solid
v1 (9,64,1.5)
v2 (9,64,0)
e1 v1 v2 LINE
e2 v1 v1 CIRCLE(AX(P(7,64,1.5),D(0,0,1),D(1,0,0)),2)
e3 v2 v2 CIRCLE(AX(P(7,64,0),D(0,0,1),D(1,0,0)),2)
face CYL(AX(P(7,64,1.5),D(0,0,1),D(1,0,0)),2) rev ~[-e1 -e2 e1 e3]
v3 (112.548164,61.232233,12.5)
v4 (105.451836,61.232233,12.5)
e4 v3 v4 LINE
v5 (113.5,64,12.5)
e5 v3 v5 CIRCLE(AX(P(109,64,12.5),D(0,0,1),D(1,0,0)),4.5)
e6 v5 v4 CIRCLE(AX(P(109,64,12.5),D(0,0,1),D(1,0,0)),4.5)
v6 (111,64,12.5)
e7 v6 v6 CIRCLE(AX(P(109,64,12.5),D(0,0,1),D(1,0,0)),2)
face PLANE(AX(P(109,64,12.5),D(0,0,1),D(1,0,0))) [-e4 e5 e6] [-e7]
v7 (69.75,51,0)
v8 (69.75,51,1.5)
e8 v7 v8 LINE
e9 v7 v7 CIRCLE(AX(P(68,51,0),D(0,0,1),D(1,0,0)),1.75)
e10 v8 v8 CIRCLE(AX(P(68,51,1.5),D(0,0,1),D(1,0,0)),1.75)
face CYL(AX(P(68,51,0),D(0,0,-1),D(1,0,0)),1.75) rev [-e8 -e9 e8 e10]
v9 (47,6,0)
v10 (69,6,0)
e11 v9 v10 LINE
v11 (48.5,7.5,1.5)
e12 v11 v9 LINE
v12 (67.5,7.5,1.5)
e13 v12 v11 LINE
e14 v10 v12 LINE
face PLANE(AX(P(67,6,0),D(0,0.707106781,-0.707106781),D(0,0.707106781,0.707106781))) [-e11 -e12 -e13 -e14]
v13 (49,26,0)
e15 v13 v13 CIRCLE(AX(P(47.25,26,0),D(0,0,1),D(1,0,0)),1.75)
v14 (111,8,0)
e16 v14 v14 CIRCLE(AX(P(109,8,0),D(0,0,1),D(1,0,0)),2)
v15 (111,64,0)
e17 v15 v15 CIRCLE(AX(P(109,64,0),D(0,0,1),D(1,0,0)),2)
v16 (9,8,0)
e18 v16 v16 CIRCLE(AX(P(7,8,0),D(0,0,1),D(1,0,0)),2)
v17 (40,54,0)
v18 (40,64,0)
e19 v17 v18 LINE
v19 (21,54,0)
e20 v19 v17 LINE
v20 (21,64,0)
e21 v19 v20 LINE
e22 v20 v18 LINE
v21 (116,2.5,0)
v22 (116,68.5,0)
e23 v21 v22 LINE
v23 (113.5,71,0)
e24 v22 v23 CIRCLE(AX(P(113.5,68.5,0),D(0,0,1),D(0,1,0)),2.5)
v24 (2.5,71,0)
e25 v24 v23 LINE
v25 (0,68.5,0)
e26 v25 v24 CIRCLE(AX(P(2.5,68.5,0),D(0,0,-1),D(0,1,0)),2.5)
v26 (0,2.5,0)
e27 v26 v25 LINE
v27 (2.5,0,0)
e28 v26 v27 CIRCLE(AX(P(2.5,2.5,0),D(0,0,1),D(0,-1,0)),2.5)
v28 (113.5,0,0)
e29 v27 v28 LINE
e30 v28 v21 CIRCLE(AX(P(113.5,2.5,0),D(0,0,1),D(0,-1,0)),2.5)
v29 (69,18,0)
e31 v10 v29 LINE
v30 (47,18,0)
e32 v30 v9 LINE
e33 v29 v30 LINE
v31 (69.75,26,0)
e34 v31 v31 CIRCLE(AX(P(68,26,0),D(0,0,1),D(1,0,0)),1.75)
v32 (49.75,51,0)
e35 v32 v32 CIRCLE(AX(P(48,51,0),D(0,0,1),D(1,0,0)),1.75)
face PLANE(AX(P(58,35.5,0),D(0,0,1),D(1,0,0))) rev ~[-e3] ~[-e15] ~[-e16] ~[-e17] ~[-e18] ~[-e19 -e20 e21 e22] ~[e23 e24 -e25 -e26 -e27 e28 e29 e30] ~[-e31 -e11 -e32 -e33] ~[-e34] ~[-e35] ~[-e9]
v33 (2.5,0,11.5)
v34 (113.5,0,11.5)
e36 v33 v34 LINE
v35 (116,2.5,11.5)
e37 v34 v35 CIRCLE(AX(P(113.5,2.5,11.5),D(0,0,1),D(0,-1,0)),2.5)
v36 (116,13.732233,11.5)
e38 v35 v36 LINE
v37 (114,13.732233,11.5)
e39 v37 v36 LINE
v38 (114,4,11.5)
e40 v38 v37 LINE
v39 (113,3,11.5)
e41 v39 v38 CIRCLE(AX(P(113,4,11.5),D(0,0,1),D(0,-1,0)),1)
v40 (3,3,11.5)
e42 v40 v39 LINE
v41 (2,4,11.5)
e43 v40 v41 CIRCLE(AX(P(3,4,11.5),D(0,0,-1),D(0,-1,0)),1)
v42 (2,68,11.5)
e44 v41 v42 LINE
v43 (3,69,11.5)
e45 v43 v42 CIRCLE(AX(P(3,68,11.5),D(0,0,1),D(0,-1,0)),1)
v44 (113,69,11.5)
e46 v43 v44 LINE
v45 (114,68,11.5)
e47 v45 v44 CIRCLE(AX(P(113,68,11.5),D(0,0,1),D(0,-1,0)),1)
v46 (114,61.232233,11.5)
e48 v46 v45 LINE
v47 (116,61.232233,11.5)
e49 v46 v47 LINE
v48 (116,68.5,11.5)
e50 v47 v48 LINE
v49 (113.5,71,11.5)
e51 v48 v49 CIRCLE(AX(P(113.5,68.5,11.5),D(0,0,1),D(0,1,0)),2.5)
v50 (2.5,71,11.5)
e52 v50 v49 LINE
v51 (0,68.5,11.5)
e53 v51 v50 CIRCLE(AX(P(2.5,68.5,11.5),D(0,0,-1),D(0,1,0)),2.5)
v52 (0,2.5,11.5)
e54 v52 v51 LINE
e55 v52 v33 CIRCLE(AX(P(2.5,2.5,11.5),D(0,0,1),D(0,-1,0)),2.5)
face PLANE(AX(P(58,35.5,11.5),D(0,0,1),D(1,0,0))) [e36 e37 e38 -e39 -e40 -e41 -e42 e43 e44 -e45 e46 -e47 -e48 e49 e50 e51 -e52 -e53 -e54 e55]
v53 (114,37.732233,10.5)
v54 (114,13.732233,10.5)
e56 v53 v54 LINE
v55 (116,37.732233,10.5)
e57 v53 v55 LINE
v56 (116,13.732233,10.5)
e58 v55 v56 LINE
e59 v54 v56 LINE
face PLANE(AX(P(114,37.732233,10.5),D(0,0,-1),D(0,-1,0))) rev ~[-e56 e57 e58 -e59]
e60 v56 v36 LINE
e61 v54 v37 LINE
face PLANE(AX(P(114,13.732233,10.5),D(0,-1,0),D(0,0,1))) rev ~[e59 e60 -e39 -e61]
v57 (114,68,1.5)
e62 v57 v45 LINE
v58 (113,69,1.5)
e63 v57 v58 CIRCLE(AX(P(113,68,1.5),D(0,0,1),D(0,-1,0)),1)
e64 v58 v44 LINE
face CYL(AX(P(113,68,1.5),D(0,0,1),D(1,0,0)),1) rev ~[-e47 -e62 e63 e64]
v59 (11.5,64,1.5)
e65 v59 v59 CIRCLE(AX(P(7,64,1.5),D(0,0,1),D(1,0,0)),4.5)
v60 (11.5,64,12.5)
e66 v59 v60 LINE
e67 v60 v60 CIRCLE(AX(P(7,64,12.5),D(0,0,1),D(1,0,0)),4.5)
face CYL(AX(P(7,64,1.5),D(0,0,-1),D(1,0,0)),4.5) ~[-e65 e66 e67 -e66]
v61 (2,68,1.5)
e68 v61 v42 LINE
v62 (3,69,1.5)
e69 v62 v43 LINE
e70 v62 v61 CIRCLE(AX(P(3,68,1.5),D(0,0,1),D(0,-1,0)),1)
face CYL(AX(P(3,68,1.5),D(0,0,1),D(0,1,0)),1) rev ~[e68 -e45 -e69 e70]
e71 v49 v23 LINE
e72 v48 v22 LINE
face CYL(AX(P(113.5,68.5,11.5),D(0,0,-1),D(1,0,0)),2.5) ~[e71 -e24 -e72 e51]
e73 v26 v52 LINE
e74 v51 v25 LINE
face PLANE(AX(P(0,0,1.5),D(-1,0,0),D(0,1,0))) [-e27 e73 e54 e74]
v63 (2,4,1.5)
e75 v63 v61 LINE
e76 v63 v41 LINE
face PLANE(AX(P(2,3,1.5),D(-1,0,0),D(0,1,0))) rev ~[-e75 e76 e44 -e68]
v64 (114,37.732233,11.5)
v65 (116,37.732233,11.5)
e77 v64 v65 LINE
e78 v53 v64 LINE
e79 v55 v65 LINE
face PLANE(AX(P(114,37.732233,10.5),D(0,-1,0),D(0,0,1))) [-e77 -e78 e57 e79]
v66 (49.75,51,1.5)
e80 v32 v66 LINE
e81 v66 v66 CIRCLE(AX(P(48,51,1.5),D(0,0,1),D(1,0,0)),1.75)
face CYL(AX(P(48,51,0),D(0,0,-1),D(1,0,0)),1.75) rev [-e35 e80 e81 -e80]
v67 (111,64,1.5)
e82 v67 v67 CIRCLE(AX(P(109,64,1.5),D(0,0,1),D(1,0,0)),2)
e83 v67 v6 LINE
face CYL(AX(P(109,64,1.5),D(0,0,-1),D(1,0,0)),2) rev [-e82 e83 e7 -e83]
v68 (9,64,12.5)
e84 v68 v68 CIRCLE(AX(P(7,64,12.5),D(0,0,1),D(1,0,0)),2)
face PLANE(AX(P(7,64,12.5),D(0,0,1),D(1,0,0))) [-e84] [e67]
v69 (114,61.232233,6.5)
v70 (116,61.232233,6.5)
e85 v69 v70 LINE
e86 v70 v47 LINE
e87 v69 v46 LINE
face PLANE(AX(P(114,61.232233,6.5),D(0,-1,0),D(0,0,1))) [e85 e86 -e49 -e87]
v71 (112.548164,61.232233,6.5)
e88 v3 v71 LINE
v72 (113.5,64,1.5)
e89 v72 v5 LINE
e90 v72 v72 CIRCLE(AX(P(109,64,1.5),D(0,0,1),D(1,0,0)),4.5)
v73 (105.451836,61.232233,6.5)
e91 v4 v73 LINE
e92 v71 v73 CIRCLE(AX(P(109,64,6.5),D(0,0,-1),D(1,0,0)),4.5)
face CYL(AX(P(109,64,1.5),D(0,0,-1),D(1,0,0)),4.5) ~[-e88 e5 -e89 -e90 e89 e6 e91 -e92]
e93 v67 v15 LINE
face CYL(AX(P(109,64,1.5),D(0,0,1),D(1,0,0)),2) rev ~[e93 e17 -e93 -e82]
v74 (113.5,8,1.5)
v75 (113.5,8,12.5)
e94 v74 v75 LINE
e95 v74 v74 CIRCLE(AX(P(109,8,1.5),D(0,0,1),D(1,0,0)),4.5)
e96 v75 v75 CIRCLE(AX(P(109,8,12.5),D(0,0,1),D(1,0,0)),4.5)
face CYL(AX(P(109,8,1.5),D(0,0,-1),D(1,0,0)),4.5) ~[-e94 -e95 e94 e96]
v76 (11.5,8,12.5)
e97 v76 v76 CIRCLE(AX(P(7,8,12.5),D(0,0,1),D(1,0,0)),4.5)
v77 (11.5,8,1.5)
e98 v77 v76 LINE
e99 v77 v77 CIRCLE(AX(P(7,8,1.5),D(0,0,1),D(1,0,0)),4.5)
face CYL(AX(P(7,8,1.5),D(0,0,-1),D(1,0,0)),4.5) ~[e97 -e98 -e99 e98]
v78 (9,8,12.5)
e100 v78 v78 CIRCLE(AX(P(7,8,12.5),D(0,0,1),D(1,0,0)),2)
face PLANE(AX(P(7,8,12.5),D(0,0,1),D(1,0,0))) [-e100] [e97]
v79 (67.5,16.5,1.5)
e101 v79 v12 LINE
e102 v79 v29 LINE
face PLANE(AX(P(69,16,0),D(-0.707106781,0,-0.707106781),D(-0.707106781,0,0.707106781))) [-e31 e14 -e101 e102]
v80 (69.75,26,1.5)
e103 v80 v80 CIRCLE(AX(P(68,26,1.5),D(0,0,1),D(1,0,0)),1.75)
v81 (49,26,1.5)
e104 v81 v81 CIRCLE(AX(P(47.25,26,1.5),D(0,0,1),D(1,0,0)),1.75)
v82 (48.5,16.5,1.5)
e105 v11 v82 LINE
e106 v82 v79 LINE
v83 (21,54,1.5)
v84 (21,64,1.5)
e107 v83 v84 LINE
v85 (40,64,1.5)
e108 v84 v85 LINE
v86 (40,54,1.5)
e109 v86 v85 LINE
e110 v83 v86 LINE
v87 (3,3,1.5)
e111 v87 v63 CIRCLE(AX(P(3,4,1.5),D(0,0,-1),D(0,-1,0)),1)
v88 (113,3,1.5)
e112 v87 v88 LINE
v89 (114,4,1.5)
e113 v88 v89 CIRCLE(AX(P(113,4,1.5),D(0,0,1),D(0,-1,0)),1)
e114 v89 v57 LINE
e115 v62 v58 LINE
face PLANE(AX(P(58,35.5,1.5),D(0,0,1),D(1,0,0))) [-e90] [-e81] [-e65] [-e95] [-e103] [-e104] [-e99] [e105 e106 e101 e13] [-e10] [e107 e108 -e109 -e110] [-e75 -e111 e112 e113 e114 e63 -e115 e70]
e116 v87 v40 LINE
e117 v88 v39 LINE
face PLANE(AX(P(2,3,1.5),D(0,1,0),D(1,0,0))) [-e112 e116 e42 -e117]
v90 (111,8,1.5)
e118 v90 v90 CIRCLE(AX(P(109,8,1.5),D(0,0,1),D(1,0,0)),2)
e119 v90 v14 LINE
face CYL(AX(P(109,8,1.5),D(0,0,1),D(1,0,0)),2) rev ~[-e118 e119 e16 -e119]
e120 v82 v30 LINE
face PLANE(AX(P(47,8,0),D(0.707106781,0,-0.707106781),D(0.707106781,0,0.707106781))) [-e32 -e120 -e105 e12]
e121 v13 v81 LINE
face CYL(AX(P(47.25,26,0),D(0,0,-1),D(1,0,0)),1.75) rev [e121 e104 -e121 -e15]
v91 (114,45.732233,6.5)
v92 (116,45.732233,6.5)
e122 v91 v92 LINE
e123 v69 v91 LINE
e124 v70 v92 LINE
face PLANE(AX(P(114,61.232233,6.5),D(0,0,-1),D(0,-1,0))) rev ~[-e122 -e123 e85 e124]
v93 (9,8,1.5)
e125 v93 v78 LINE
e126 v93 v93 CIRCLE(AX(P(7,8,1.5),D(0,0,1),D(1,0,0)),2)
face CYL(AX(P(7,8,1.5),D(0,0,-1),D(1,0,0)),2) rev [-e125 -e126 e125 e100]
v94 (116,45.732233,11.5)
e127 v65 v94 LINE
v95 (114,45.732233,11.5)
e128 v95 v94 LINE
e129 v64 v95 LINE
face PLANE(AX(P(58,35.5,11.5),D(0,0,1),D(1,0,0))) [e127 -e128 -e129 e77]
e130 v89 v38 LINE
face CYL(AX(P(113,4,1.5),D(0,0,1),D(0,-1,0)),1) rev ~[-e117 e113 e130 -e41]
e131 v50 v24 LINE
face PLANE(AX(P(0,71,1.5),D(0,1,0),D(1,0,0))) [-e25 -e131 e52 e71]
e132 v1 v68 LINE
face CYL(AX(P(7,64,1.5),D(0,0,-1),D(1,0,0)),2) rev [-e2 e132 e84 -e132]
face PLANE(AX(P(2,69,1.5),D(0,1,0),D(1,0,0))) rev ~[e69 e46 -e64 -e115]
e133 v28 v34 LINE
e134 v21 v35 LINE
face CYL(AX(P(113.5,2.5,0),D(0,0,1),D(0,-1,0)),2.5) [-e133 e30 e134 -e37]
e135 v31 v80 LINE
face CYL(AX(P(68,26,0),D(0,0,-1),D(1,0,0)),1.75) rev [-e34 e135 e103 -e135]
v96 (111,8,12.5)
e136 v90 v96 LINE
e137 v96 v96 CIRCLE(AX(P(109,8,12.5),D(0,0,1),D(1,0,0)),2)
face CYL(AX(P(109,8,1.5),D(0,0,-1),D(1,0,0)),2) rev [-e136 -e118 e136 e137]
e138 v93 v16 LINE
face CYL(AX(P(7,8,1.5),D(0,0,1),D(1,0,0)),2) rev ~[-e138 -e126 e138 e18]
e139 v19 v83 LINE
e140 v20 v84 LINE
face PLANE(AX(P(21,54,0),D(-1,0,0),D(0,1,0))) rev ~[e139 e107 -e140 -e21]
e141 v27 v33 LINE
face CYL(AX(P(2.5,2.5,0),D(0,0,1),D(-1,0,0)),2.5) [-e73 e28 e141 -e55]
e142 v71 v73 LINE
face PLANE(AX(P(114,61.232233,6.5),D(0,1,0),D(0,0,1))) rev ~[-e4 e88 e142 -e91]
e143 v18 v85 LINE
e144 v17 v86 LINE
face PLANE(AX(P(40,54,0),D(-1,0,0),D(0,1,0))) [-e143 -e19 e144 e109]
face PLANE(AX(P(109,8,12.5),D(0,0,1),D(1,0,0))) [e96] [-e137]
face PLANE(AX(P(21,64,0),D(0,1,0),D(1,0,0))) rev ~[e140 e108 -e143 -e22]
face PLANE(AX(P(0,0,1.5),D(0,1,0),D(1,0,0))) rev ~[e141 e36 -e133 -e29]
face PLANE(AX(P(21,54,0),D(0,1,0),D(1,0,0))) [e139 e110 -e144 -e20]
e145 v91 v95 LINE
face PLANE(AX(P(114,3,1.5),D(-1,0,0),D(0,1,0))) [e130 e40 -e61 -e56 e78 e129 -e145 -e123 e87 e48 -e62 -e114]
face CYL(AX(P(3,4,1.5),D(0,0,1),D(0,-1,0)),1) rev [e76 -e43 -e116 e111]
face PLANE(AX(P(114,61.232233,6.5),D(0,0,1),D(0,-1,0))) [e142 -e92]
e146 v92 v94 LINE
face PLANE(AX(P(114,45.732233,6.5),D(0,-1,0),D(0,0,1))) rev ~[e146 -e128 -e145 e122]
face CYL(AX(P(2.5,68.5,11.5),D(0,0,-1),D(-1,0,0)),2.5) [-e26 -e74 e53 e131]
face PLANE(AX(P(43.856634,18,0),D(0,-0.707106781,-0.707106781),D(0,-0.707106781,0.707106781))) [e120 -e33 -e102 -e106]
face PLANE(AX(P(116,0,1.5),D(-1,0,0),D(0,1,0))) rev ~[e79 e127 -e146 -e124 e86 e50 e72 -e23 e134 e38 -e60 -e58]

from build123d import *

# Parameters (mm, degrees)
F0_W         = 116
F0_H         = 71
F0_R         = 1.75
F0_W_2       = 18
F0_H_2       = 8
F0_W_3       = 19
F0_H_3       = 10
F1_DEPTH     = 1.5
F2_W         = 116
F2_H         = 71
F2_W_2       = 112
F2_H_2       = 66
F3_DEPTH     = 10
F4_R         = 2.5
F5_R         = 1
F6_R         = 4.5
F6_R_2       = 2
F7_DEPTH     = 11
F8_T1_DEPTH  = 8
F8_T3_DEPTH  = 18
F8_T9_DEPTH  = 23.1433659759
F8_T13_DEPTH = 13.1433659759
F8_T20_DEPTH = 23.1433659759
F8_T24_DEPTH = 13.1433659759
F8_T31_DEPTH = 23.1433659759
F8_T35_DEPTH = 13.1433659759
F8_T42_DEPTH = 13.1433659759
F8_T46_DEPTH = 23.1433659759
F9_W         = 15.5
F9_H         = 9
F9_W_2       = 24
F9_H_2       = 5
F10_DEPTH    = 25
F11_DEPTH    = 25
F12_DEPTH    = 25


# Not quite as in the source:
# - a fillet or chamfer that OpenCascade refuses, or shapes differently, is made with other operations: its cross-section is extruded or revolved along the edge and cut away or added


with BuildPart() as f1:
    # F0 (on Top) → F1 (new body)
    with BuildSketch(Plane.XY):
        with Locations((58, 35.5)):
            Rectangle(F0_W, F0_H)
        with Locations((47.25, 26)):
            Circle(F0_R, mode=Mode.SUBTRACT)
        with Locations((58, 12)):
            Rectangle(F0_W_2, F0_H_2, mode=Mode.SUBTRACT)
        with Locations((68, 26)):
            Circle(F0_R, mode=Mode.SUBTRACT)
        with Locations((48, 51)):
            Circle(F0_R, mode=Mode.SUBTRACT)
        with Locations((30.5, 59)):
            Rectangle(F0_W_3, F0_H_3, mode=Mode.SUBTRACT)
        with Locations((68, 51)):
            Circle(F0_R, mode=Mode.SUBTRACT)
    extrude(amount=F1_DEPTH)

    # F2 (on face) → F3 (join)
    with BuildSketch(Plane.XY.offset(1.5)):
        with Locations((58, 35.5)):
            Rectangle(F2_W, F2_H)
        with Locations((58, 36)):
            Rectangle(F2_W_2, F2_H_2, mode=Mode.SUBTRACT)
    extrude(amount=F3_DEPTH)

    # F4
    f4_edges = [f1.edges().sort_by_distance(p)[0] for p in [
        (0, 0, 5.75),
        (116, 0, 5.75),
        (0, 71, 5.75),
        (116, 71, 5.75),
    ]]
    fillet(f4_edges, radius=F4_R)

    # F5
    f5_edges = [f1.edges().sort_by_distance(p)[0] for p in [
        (114, 3, 6.5),
        (2, 3, 6.5),
        (2, 69, 6.5),
        (114, 69, 6.5),
    ]]
    fillet(f5_edges, radius=F5_R)

    # F6 (on face) → F7 (join)
    with BuildSketch(Plane.XY.offset(1.5)):
        with Locations((7, 64)):
            Circle(F6_R)
        with Locations((7, 64)):
            Circle(F6_R_2, mode=Mode.SUBTRACT)
        with Locations((7, 8)):
            Circle(F6_R)
        with Locations((7, 8)):
            Circle(F6_R_2, mode=Mode.SUBTRACT)
        with Locations((109, 8)):
            Circle(F6_R)
        with Locations((109, 8)):
            Circle(F6_R_2, mode=Mode.SUBTRACT)
        with Locations((109, 64)):
            Circle(F6_R)
        with Locations((109, 64)):
            Circle(F6_R_2, mode=Mode.SUBTRACT)
    extrude(amount=F7_DEPTH)

    # F8: chamfer of 2 on 4 edges, made by hand

    # F8_s2 → F8_t1 (cut)
    with BuildSketch(Plane.XZ.offset(-16)):
        Polygon((69, 0), (67, 2), (67, 0), align=None)
        Polygon((47, 0), (49, 2), (49, 0), align=None)
    extrude(amount=F8_T1_DEPTH, mode=Mode.SUBTRACT)

    # F8_s4 → F8_t3 (cut)
    with BuildSketch(Plane.YZ.offset(49)):
        Polygon((6, 0), (8, 2), (8, 0), align=None)
        Polygon((18, 0), (16, 2), (16, 0), align=None)
    extrude(amount=F8_T3_DEPTH, mode=Mode.SUBTRACT)


with BuildPart() as f8_tool7:
    # F8_s8 → F8_t9 (new body)
    with BuildSketch(Plane.YZ.offset(49)):
        Polygon((18, 0), (16, 2), (16, 0), align=None)
    extrude(amount=F8_T9_DEPTH)

    split(bisect_by=Plane.YZ.offset(67), keep=Keep.TOP)


with BuildPart() as f8_tool11:
    # F8_s12 → F8_t13 (new body)
    with BuildSketch(Plane.XZ.offset(-21.1433659759)):
        Polygon((69, 0), (67, 2), (67, 0), align=None)
    extrude(amount=F8_T13_DEPTH)

    split(bisect_by=Plane.XZ.offset(-16), keep=Keep.BOTTOM)


with BuildPart() as f8_tool7_1:
    add(f8_tool7.part)

    # F8_t15: intersect F8_tool11
    add(f8_tool11.part, mode=Mode.INTERSECT)


with BuildPart() as f1_1:
    add(f1.part)

    # F8_t5: cut F8_tool7
    add(f8_tool7_1.part, mode=Mode.SUBTRACT)


with BuildPart() as f8_tool18:
    # F8_s19 → F8_t20 (new body)
    with BuildSketch(Plane.YZ.offset(72.1433659759)):
        Polygon((6, 0), (8, 2), (8, 0), align=None)
    extrude(amount=-F8_T20_DEPTH)

    split(bisect_by=Plane.YZ.offset(67), keep=Keep.TOP)


with BuildPart() as f8_tool22:
    # F8_s23 → F8_t24 (new body)
    with BuildSketch(Plane.XZ.offset(-16)):
        Polygon((69, 0), (67, 2), (67, 0), align=None)
    extrude(amount=F8_T24_DEPTH)

    split(bisect_by=Plane.XZ.offset(-8), keep=Keep.TOP)


with BuildPart() as f8_tool18_1:
    add(f8_tool18.part)

    # F8_t26: intersect F8_tool22
    add(f8_tool22.part, mode=Mode.INTERSECT)


with BuildPart() as f1_2:
    add(f1_1.part)

    # F8_t16: cut F8_tool18
    add(f8_tool18_1.part, mode=Mode.SUBTRACT)


with BuildPart() as f8_tool29:
    # F8_s30 → F8_t31 (new body)
    with BuildSketch(Plane.YZ.offset(67)):
        Polygon((6, 0), (8, 2), (8, 0), align=None)
    extrude(amount=-F8_T31_DEPTH)

    split(bisect_by=Plane.YZ.offset(49), keep=Keep.BOTTOM)


with BuildPart() as f8_tool33:
    # F8_s34 → F8_t35 (new body)
    with BuildSketch(Plane.XZ.offset(-2.8566340241)):
        Polygon((47, 0), (49, 2), (49, 0), align=None)
    extrude(amount=-F8_T35_DEPTH)

    split(bisect_by=Plane.XZ.offset(-8), keep=Keep.TOP)


with BuildPart() as f8_tool29_1:
    add(f8_tool29.part)

    # F8_t37: intersect F8_tool33
    add(f8_tool33.part, mode=Mode.INTERSECT)


with BuildPart() as f1_3:
    add(f1_2.part)

    # F8_t27: cut F8_tool29
    add(f8_tool29_1.part, mode=Mode.SUBTRACT)


with BuildPart() as f8_tool40:
    # F8_s41 → F8_t42 (new body)
    with BuildSketch(Plane.XZ.offset(-8)):
        Polygon((47, 0), (49, 2), (49, 0), align=None)
    extrude(amount=-F8_T42_DEPTH)

    split(bisect_by=Plane.XZ.offset(-16), keep=Keep.BOTTOM)


with BuildPart() as f8_tool44:
    # F8_s45 → F8_t46 (new body)
    with BuildSketch(Plane.YZ.offset(43.8566340241)):
        Polygon((18, 0), (16, 2), (16, 0), align=None)
    extrude(amount=F8_T46_DEPTH)

    split(bisect_by=Plane.YZ.offset(49), keep=Keep.BOTTOM)


with BuildPart() as f8_tool40_1:
    add(f8_tool40.part)

    # F8_t48: intersect F8_tool44
    add(f8_tool44.part, mode=Mode.INTERSECT)


with BuildPart() as f1_4:
    add(f1_3.part)

    # F8_t38: cut F8_tool40
    add(f8_tool40_1.part, mode=Mode.SUBTRACT)

    # F9 (on face) → F10 (cut)
    with BuildSketch(Plane(origin=(114, 0, 0), x_dir=(0, -1, 0), z_dir=(-1, 0, 0))):
        with Locations((-53.482233047, 11)):
            Rectangle(F9_W, F9_H)
        with Locations((-25.732233047, 13)):
            Rectangle(F9_W_2, F9_H_2)
    extrude(amount=-F10_DEPTH, mode=Mode.SUBTRACT)

    # F11 (cut): faces of the model
    f11_faces = [f1_4.faces().sort_by_distance(p)[0] for p in [
        (7, 8, 1.5),
        (7, 64, 1.5),
        (109, 8, 1.5),
        (109, 64, 1.5),
    ]]
    extrude(f11_faces, amount=-F11_DEPTH, mode=Mode.SUBTRACT)

    # F9 (on face) → F12 (cut)
    with BuildSketch(Plane(origin=(114, 0, 0), x_dir=(0, -1, 0), z_dir=(-1, 0, 0))):
        with Locations((-53.482233047, 11)):
            Rectangle(F9_W, F9_H)
        with Locations((-25.732233047, 13)):
            Rectangle(F9_W_2, F9_H_2)
    extrude(amount=F12_DEPTH, mode=Mode.SUBTRACT)


solid = f1_4.part
